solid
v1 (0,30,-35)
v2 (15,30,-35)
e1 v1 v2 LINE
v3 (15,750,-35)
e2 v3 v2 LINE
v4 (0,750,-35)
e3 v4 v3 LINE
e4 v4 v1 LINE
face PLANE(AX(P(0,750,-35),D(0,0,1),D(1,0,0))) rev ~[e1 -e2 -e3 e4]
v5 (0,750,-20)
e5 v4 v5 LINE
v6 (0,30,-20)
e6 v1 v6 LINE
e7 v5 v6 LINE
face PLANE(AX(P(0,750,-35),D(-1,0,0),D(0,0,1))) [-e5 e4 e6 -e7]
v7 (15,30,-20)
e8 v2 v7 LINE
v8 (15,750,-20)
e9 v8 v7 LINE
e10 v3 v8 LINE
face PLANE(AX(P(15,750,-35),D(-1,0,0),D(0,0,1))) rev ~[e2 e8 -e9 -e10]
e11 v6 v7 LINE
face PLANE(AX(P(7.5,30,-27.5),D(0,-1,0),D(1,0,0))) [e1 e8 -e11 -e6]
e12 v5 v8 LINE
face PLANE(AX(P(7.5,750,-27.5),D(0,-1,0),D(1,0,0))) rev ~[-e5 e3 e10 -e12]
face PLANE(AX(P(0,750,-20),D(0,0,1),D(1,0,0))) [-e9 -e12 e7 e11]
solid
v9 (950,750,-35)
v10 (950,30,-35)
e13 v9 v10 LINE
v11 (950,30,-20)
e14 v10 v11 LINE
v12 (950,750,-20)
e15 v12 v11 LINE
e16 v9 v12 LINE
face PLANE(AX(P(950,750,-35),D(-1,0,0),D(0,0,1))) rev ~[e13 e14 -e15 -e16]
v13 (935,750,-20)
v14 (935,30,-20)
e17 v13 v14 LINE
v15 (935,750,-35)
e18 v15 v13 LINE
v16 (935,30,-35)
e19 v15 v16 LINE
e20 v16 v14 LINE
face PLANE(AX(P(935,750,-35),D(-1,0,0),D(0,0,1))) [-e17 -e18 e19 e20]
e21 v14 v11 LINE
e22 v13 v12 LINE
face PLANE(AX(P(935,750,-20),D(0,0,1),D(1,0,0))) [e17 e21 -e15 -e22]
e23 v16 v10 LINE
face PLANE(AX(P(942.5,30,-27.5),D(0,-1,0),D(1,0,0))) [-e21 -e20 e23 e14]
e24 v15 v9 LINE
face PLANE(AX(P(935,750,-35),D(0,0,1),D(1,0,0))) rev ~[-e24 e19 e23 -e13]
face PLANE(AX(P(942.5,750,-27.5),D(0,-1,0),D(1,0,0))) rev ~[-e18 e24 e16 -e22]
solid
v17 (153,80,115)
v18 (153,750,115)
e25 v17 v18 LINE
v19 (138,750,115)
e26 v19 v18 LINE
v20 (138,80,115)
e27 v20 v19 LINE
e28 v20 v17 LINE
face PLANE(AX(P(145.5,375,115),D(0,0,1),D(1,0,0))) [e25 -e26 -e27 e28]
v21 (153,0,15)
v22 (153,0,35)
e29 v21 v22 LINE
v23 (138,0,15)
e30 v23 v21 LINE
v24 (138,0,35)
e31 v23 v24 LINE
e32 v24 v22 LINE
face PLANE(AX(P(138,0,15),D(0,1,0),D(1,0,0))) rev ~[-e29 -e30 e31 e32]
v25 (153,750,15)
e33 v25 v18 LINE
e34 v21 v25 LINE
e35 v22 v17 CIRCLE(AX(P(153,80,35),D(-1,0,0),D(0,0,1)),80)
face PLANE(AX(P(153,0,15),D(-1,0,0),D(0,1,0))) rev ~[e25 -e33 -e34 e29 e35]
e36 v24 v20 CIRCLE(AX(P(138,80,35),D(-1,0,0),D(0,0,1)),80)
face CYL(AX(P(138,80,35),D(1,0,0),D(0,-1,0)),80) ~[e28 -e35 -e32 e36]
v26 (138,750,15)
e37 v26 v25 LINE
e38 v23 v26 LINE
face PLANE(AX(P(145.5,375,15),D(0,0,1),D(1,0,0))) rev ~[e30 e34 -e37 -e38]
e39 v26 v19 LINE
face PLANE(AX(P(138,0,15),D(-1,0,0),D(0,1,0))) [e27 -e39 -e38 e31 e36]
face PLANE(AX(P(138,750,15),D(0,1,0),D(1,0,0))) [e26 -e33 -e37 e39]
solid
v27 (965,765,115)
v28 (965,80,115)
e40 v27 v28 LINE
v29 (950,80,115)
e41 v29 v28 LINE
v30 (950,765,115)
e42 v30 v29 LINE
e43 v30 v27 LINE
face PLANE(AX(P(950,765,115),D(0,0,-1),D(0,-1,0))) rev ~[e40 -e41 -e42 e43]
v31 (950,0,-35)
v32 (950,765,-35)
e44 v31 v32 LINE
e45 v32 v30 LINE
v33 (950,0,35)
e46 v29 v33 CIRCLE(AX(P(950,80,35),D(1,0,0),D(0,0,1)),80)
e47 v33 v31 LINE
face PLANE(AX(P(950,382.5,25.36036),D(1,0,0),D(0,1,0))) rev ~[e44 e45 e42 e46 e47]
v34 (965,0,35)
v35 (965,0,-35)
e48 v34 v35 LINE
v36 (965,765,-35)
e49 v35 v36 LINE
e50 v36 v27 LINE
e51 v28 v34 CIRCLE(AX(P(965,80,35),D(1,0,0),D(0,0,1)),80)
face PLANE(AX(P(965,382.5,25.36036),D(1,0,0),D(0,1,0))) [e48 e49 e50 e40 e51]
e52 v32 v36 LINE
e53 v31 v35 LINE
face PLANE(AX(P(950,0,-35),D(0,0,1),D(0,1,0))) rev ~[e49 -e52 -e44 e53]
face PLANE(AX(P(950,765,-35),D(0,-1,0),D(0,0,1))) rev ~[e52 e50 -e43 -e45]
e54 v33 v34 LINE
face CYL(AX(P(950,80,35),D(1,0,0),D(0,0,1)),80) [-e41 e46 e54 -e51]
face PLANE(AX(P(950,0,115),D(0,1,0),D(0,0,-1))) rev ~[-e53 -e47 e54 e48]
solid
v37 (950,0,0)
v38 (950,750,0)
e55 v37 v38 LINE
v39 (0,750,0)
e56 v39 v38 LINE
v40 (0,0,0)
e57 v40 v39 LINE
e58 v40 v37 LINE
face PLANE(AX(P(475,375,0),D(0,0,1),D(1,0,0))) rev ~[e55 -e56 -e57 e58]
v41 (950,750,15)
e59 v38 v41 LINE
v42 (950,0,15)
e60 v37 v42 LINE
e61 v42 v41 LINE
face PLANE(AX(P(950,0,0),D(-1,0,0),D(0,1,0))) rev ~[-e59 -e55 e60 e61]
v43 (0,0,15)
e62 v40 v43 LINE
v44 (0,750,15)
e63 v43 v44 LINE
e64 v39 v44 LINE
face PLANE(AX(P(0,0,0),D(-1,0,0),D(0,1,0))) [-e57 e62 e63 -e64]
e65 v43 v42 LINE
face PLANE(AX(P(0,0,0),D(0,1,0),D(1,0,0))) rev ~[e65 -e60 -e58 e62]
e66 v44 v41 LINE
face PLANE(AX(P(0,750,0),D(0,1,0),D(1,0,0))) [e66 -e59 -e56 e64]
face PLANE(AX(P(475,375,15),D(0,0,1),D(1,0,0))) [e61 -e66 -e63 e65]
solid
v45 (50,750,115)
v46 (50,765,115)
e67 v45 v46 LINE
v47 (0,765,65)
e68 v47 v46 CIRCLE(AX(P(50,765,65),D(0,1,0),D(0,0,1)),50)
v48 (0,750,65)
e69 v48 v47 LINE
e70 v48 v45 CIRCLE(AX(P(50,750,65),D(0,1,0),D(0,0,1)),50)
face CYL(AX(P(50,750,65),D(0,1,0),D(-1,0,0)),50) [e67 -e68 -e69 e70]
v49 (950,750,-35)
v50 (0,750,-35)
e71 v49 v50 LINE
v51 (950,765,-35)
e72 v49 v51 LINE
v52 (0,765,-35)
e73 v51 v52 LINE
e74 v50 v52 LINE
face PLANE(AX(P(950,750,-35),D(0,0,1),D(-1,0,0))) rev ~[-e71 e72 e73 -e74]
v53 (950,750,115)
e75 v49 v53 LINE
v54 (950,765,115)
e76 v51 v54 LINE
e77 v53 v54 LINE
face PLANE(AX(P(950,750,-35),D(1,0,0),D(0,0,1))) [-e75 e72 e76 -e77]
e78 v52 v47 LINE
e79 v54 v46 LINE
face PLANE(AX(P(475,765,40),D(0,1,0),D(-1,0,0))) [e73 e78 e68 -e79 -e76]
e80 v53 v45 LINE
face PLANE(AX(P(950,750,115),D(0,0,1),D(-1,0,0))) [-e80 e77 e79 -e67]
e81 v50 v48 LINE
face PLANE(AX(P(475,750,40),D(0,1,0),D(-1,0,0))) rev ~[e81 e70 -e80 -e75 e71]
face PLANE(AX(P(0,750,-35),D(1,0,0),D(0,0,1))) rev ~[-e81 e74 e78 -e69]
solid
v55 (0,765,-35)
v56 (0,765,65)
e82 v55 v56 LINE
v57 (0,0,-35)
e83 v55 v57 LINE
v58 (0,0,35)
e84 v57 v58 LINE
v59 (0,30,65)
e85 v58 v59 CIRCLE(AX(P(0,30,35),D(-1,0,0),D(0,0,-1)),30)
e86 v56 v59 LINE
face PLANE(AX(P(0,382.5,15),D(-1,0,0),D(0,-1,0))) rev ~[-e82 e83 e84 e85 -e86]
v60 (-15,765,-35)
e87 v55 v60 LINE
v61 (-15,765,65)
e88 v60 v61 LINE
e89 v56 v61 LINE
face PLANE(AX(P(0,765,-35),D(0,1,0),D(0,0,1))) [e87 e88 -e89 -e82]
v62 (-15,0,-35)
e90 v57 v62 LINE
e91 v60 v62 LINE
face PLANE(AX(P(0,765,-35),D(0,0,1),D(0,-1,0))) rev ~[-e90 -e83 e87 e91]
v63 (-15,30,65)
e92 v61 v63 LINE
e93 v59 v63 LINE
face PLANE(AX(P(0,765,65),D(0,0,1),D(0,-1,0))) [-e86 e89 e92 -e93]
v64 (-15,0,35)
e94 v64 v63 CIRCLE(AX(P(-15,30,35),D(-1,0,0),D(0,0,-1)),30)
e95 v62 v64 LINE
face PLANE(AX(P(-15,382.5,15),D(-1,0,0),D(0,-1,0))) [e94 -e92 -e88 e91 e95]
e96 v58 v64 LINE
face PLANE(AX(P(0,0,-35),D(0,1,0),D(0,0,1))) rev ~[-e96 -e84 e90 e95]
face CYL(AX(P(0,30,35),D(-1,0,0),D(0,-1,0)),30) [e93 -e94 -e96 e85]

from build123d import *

# Parameters (mm, degrees)
F0_W      = 950
F0_H      = 750
F1_DEPTH  = 15
F2_W      = 750
F2_H      = 15
F3_DEPTH  = 15
F4_R      = 80
F5_W      = 765
F5_H      = 100
F6_DEPTH  = 15
F7_R      = 30
F8_W      = 15
F8_H      = 750
F9_DEPTH  = 100
F10_R     = 80
F11_W     = 950
F11_H     = 150
F12_DEPTH = 15
F13_R     = 50
F14_W     = 15
F14_H     = 15
F15_DEPTH = 720


# Not quite as in the source:
# - a feature names something its author has since deleted; it is built from what else it names


with BuildPart() as f1:
    # F0 (on Top) → F1 (new body)
    with BuildSketch(Plane.XY):
        with Locations((475, 375)):
            Rectangle(F0_W, F0_H)
    extrude(amount=F1_DEPTH)


with BuildPart() as f3:
    # F2 (on face) → F3 (new body)
    with BuildSketch(Plane.YZ.offset(950)):
        Polygon((0, 0), (0, -35), (765, -35), (765, 115), (0, 115), (0, 15), (750, 15), (750, 0), align=None)
        with Locations((375, 7.5)):
            Rectangle(F2_W, F2_H)
    extrude(amount=F3_DEPTH)

    # F4
    f4_edges = [f3.edges().sort_by_distance(p)[0] for p in [
        (957.5, 0, 115),
    ]]
    fillet(f4_edges, radius=F4_R)


with BuildPart() as f6:
    # F5 (on face) → F6 (new body)
    with BuildSketch(Plane(origin=(0, 0, 0), x_dir=(0, -1, 0), z_dir=(-1, 0, 0))):
        with Locations((-382.5, 15)):
            Rectangle(F5_W, F5_H)
    extrude(amount=F6_DEPTH)

    # F7
    f7_edges = [f6.edges().sort_by_distance(p)[0] for p in [
        (-7.5, 0, 65),
    ]]
    fillet(f7_edges, radius=F7_R)


with BuildPart() as f9:
    # F8 (on face) → F9 (new body)
    with BuildSketch(Plane.XY.offset(15)):
        with Locations((145.5, 375)):
            Rectangle(F8_W, F8_H)
    extrude(amount=F9_DEPTH)

    # F10
    f10_edges = [f9.edges().sort_by_distance(p)[0] for p in [
        (145.5, 0, 115),
    ]]
    fillet(f10_edges, radius=F10_R)


with BuildPart() as f12:
    # F11 (on face) → F12 (new body)
    with BuildSketch(Plane(origin=(0, 750, 0), x_dir=(-1, 0, 0), z_dir=(0, 1, 0))):
        with Locations((-475, 40)):
            Rectangle(F11_W, F11_H)
    extrude(amount=F12_DEPTH)

    # F13
    f13_edges = [f12.edges().sort_by_distance(p)[0] for p in [
        (0, 757.5, 115),
    ]]
    fillet(f13_edges, radius=F13_R)


with BuildPart() as f15:
    # F14 (on face) → F15 (new body)
    with BuildSketch(Plane.XZ.offset(-750)):
        with Locations((7.5, -27.5)):
            Rectangle(F14_W, F14_H)
    extrude(amount=F15_DEPTH)


with BuildPart() as f15b:
    # F14 (on face) → F15, piece 2 (new body)
    with BuildSketch(Plane.XZ.offset(-750)):
        with Locations((942.5, -27.5)):
            Rectangle(F14_W, F14_H)
    extrude(amount=F15_DEPTH)


solid = Compound([f1.part, f3.part, f6.part, f9.part, f12.part, f15.part, f15b.part])
